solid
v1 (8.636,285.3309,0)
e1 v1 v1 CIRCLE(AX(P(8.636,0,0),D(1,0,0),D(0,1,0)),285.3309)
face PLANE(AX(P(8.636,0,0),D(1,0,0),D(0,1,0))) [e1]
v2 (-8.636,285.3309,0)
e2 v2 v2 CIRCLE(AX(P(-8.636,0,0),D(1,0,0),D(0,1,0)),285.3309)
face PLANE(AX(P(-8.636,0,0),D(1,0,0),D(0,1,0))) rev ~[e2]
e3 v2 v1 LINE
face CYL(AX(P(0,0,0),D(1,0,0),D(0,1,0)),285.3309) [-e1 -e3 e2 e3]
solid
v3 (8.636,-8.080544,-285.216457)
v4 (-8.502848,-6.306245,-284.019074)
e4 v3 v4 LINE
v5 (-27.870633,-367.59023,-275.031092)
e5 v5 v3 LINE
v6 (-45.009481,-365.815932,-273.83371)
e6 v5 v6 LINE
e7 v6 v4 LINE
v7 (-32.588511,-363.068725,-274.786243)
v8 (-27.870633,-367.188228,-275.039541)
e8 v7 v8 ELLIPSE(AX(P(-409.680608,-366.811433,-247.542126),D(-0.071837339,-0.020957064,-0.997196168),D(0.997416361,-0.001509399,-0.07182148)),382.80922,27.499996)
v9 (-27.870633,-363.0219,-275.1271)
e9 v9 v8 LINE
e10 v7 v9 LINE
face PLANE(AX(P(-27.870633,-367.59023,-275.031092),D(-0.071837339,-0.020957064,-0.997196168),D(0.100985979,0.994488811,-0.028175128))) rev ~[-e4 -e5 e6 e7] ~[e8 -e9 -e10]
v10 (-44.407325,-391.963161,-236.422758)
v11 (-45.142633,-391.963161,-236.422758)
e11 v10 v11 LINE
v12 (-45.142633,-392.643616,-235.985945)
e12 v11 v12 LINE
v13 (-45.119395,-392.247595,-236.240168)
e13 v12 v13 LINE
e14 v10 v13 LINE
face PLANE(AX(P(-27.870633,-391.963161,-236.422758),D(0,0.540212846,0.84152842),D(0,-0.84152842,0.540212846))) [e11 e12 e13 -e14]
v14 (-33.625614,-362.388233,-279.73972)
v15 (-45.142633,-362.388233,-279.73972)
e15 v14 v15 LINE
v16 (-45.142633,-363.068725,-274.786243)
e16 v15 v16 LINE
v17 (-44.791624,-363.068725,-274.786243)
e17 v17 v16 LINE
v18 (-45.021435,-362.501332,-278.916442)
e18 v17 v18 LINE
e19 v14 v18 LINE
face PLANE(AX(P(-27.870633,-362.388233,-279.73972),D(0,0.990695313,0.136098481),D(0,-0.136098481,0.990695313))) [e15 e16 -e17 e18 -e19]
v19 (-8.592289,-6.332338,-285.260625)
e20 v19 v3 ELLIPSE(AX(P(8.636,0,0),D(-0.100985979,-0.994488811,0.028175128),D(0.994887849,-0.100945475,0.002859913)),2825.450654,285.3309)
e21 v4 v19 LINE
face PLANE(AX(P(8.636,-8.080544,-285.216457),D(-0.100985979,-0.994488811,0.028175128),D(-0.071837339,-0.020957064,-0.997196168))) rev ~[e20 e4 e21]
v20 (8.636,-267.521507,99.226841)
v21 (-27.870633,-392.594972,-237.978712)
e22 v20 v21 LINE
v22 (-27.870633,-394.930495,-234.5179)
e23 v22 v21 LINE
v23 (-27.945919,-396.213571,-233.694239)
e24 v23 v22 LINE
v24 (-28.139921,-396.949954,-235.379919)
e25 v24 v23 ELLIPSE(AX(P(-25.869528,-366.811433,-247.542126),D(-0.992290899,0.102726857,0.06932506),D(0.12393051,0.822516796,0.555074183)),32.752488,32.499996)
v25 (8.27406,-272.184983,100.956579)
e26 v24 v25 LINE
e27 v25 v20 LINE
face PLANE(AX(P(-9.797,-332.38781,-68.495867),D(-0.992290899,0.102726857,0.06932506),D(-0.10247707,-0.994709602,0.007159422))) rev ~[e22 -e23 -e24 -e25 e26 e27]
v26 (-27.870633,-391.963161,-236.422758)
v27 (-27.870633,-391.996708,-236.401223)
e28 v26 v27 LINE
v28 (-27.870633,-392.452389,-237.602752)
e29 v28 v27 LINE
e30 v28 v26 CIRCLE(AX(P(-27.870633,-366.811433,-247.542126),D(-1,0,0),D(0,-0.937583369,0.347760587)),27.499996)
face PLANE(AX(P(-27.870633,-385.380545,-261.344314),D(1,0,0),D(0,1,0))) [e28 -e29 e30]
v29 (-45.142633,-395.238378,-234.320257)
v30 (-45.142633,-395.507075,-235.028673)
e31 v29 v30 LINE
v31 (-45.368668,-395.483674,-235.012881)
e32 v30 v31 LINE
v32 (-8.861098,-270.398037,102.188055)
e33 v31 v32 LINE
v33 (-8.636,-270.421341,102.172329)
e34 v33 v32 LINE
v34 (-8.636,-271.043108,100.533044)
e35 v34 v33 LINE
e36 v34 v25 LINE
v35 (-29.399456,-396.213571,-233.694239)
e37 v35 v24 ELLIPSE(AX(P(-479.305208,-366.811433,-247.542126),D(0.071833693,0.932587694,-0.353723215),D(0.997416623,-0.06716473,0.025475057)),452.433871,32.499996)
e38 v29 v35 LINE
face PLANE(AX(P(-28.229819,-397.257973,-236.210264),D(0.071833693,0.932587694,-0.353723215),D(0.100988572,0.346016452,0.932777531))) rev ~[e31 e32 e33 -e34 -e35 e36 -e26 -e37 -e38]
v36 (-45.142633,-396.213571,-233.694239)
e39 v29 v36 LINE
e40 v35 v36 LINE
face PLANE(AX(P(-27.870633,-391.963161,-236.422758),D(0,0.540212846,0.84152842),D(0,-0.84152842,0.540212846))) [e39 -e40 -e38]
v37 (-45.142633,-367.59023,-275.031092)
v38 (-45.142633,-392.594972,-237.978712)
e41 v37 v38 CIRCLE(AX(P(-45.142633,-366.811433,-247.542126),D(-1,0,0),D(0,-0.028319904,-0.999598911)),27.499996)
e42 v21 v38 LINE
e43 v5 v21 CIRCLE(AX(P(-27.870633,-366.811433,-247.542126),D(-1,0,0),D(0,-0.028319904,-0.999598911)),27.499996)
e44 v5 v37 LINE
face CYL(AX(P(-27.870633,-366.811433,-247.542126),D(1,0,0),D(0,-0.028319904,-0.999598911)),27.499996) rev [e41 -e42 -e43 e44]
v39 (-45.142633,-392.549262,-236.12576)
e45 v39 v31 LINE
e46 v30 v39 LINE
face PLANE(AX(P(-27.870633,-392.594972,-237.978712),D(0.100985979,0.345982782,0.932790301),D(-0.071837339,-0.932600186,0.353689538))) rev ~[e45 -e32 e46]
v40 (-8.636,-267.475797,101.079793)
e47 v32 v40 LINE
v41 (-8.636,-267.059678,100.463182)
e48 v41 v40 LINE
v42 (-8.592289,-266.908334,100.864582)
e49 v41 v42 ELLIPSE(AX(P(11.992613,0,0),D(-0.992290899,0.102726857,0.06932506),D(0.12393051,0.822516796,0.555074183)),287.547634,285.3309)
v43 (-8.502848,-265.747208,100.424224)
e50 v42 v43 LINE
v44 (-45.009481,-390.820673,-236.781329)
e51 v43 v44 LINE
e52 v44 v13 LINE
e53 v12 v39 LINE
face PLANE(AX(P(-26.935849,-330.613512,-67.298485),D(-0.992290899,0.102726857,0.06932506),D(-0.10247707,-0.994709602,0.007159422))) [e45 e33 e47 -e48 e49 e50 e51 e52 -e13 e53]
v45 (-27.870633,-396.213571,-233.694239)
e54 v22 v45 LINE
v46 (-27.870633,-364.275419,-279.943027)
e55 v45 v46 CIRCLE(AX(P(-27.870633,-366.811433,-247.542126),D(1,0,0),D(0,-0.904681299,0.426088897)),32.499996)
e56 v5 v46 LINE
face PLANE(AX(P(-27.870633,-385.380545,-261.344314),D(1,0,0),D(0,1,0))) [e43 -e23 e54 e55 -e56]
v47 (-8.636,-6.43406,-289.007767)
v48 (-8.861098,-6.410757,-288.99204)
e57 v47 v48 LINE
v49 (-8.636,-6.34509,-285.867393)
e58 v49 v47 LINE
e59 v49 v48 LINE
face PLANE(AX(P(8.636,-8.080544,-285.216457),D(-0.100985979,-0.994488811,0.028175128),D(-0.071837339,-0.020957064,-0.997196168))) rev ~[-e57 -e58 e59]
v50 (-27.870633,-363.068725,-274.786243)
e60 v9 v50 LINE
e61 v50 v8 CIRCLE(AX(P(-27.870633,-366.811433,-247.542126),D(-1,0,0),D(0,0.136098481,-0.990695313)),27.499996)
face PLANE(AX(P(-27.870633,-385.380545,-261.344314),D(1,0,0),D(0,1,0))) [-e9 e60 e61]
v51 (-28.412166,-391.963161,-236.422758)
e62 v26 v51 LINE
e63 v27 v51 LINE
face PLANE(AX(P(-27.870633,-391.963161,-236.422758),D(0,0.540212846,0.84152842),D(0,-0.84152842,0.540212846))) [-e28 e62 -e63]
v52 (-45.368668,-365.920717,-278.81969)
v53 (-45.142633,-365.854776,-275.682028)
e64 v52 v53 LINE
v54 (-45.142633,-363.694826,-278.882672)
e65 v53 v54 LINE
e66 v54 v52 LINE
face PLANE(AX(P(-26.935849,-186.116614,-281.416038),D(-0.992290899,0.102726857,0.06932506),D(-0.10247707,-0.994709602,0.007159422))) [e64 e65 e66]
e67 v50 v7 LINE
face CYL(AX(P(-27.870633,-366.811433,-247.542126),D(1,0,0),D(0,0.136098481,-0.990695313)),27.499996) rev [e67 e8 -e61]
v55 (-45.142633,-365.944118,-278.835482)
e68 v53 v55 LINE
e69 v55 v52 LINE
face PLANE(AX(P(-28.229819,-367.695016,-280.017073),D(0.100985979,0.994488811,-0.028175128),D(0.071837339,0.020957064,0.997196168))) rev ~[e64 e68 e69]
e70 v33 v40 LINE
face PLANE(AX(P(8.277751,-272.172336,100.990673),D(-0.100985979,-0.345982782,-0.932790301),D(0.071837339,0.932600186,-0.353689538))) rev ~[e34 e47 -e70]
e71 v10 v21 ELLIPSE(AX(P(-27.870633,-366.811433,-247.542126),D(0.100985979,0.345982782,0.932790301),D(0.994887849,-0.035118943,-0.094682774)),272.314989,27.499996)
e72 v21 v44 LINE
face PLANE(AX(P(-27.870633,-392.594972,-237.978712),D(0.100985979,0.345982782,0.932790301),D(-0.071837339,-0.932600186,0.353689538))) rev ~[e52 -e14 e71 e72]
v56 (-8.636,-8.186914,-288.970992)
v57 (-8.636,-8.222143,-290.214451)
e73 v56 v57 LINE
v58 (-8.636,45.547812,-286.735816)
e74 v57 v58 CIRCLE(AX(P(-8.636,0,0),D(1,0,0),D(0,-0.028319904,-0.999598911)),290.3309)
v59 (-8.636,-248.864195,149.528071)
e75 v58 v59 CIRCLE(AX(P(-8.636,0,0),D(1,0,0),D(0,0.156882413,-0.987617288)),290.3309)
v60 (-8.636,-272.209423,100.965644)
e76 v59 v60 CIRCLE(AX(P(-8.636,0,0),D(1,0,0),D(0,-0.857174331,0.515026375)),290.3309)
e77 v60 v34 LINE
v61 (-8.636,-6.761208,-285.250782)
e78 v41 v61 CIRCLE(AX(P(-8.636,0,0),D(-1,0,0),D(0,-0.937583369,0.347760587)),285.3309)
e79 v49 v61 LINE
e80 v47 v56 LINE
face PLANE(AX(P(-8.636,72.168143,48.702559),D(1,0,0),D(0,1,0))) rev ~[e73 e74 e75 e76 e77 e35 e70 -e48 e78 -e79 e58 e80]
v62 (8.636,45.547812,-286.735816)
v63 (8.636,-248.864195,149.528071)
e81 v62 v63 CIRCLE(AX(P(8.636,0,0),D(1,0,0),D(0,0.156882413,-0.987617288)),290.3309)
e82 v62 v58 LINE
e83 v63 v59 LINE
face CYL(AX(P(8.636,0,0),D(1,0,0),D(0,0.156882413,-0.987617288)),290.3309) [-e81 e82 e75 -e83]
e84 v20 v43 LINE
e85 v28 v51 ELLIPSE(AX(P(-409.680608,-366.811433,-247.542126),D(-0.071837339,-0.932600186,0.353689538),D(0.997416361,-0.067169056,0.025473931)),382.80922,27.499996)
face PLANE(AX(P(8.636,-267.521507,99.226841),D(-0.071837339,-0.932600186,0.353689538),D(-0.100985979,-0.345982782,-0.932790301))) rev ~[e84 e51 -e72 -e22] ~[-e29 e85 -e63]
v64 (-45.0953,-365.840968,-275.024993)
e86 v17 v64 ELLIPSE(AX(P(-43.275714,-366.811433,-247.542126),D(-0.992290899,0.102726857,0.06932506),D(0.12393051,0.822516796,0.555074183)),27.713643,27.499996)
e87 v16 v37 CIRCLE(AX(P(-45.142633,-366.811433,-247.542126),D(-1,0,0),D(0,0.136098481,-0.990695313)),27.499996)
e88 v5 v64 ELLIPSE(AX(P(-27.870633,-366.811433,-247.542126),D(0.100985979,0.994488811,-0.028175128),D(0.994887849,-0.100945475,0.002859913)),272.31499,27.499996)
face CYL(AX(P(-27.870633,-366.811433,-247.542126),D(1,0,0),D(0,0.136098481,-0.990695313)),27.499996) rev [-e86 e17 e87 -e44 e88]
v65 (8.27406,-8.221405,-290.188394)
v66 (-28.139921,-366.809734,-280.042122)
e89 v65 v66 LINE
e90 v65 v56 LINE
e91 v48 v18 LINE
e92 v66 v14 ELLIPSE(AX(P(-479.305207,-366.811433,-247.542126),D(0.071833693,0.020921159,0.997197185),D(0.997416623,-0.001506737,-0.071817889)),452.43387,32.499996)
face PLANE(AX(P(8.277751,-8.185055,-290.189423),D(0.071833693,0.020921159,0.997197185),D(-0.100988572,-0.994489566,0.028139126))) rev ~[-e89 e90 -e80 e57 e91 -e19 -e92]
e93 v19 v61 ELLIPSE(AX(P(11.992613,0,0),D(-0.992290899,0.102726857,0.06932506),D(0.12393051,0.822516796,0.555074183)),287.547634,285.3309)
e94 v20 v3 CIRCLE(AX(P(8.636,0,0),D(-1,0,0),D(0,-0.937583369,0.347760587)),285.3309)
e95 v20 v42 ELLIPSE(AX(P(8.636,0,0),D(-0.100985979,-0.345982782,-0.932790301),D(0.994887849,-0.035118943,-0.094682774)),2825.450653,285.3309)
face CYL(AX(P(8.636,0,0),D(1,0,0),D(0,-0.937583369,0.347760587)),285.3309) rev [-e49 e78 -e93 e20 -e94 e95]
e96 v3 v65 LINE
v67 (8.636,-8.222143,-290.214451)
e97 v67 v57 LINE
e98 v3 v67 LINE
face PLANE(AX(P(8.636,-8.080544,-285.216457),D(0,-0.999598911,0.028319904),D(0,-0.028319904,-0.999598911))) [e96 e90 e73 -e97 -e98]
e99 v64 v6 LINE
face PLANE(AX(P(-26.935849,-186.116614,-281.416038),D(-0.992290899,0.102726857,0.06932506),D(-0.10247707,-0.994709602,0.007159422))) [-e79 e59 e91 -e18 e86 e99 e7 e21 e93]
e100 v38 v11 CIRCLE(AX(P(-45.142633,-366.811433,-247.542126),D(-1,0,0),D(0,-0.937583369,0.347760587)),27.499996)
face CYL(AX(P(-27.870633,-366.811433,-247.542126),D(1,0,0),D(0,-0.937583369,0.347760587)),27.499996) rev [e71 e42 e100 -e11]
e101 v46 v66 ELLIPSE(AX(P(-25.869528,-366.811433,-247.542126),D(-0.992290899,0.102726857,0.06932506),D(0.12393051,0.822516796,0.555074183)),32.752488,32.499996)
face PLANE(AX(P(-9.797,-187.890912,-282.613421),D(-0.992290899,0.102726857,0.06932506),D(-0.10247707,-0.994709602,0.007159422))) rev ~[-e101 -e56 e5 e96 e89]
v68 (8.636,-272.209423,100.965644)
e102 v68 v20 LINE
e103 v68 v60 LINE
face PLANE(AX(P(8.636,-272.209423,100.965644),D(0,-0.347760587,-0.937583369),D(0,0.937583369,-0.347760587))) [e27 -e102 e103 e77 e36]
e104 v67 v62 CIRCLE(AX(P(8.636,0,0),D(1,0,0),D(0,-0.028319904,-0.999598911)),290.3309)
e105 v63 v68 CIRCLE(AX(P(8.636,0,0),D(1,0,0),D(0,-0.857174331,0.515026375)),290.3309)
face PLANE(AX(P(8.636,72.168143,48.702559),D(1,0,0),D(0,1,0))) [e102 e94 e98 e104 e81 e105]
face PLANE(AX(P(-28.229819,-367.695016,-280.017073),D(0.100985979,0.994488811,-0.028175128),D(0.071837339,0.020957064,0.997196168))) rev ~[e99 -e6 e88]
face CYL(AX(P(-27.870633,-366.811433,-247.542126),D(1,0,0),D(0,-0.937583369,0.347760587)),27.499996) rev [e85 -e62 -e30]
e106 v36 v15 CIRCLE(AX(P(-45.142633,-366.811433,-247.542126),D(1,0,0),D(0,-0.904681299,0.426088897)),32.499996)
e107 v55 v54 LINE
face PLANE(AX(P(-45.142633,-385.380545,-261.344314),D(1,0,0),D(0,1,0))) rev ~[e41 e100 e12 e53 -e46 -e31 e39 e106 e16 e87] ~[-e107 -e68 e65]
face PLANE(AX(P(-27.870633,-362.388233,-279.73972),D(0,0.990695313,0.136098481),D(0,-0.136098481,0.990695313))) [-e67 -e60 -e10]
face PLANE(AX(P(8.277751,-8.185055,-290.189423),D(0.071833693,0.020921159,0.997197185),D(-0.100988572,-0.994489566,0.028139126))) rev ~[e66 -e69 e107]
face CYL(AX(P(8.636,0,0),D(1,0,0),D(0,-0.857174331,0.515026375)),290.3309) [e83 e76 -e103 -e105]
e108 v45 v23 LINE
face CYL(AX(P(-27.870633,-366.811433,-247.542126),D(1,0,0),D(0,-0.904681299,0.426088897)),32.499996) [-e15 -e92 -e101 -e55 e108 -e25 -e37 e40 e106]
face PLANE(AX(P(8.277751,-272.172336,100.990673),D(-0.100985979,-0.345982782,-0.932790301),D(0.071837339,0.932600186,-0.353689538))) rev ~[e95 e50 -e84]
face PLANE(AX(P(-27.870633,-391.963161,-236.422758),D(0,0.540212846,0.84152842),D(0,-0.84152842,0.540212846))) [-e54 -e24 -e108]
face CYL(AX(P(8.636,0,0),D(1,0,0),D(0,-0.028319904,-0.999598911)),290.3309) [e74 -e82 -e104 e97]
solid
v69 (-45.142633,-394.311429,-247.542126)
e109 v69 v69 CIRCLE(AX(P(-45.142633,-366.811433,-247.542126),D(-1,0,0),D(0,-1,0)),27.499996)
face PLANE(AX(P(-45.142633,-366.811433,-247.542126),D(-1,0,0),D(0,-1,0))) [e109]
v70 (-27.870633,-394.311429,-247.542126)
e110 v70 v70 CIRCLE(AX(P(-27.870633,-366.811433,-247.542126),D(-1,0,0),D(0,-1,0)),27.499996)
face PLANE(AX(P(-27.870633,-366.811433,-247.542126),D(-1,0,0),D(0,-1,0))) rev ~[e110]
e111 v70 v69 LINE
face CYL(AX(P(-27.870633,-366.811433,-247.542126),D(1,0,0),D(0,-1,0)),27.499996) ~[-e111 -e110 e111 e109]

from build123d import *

# Parameters (mm, degrees)
F0_R      = 285.3309
F1_DEPTH  = 8.636
F4_R      = 27.4999958
F5_DEPTH  = 17.272
F9_DEPTH  = 17.272
F12_DEPTH = 17.272
F14_DEPTH = 17.272


with BuildPart() as f1:
    # F0 (on Right) → F1 (new body, symmetric)
    with BuildSketch(Plane.YZ):
        Circle(F0_R)
    extrude(amount=F1_DEPTH, both=True)


with BuildPart() as f5:
    # F4 (on plane+point) → F5 (new body)
    with BuildSketch(Plane(origin=(-27.8706326, 0, 0), x_dir=(0, -1, 0), z_dir=(-1, 0, 0))):
        with Locations((366.811433, -247.5421262)):
            Circle(F4_R)
    extrude(amount=F5_DEPTH)


with BuildPart() as f9:
    # F6 (on face) → F9 (new body, through all)
    with BuildSketch(Plane.YZ.offset(8.636)):
        with BuildLine():
            ThreePointArc((45.5478122499, -286.7358162038), (240.6572930034, 162.4072006381), (-248.8641948571, 149.5280709864))
            Line((-248.8641948571, 149.5280709864), (-267.5215065798, 99.2268411875))
            ThreePointArc((-267.5215065798, 99.2268411875), (50.4062012704, 280.8432612122), (285.3309, 0))
            ThreePointArc((285.3309, 0), (198.8819923056, -204.5963724785), (-8.0805435652, -285.2164569419))
            Line((-8.0805435652, -285.2164569419), (45.5478122499, -286.7358162038))
        make_face()
        with BuildLine():
            Line((-267.5215065798, 99.2268411875), (-248.8641948571, 149.5280709864))
            ThreePointArc((-248.8641948571, 149.5280709864), (-261.6658293387, 125.7896070879), (-272.2094234262, 100.965644121))
            Line((-272.2094234262, 100.965644121), (-267.5215065798, 99.2268411875))
        make_face()
        with BuildLine():
            ThreePointArc((-8.2221430829, -290.2144514974), (18.7437088264, -289.725223055), (45.5478122499, -286.7358162038))
            Line((45.5478122499, -286.7358162038), (-8.0805435652, -285.2164569419))
            Line((-8.0805435652, -285.2164569419), (-8.2221430829, -290.2144514974))
        make_face()
    extrude(amount=-F9_DEPTH)

    # F11 (on 3pt) → F12 (join)
    with BuildSketch(Plane(origin=(28.9472699963, -2.9967644368, -2.0223618286), x_dir=(-0.1024770702, -0.9947096022, 0.0071594218), z_dir=(-0.9922908993, 0.1027268574, 0.0693250603))):
        Polygon((366.6379115019, -281.3036351275), (366.5325688778, -276.3047449575), (5.1108173853, -283.921058662), (5.2158850342, -288.9069002593), align=None)
        Polygon((270.6071909513, 101.3220147825), (265.9316262262, 99.5874398647), (391.6702989577, -239.3424597695), (396.3581002221, -237.6033452516), align=None)
    extrude(amount=F12_DEPTH)

    # F13 (on face) → F14 (join)
    with BuildSketch(Plane.YZ.offset(-27.8706326)):
        with BuildLine():
            ThreePointArc((-392.5949717172, -237.9787115264), (-392.2909462423, -237.1959107597), (-391.9631609319, -236.4227579158))
            Line((-391.9631609319, -236.4227579158), (-396.2135714078, -233.6942388503))
            ThreePointArc((-396.2135714078, -233.6942388503), (-393.0036726401, -266.7831321413), (-362.388232945, -279.7397197168))
            Line((-362.388232945, -279.7397197168), (-363.0687253491, -274.786243151))
            ThreePointArc((-363.0687253491, -274.786243151), (-365.3244296393, -275.0018893091), (-367.5902302284, -275.0310920568))
            ThreePointArc((-367.5902302284, -275.0310920568), (-389.6063699042, -262.9252539878), (-392.5949717172, -237.9787115264))
        make_face()
    extrude(amount=-F14_DEPTH)


solid = Compound([f1.part, f5.part, f9.part])
